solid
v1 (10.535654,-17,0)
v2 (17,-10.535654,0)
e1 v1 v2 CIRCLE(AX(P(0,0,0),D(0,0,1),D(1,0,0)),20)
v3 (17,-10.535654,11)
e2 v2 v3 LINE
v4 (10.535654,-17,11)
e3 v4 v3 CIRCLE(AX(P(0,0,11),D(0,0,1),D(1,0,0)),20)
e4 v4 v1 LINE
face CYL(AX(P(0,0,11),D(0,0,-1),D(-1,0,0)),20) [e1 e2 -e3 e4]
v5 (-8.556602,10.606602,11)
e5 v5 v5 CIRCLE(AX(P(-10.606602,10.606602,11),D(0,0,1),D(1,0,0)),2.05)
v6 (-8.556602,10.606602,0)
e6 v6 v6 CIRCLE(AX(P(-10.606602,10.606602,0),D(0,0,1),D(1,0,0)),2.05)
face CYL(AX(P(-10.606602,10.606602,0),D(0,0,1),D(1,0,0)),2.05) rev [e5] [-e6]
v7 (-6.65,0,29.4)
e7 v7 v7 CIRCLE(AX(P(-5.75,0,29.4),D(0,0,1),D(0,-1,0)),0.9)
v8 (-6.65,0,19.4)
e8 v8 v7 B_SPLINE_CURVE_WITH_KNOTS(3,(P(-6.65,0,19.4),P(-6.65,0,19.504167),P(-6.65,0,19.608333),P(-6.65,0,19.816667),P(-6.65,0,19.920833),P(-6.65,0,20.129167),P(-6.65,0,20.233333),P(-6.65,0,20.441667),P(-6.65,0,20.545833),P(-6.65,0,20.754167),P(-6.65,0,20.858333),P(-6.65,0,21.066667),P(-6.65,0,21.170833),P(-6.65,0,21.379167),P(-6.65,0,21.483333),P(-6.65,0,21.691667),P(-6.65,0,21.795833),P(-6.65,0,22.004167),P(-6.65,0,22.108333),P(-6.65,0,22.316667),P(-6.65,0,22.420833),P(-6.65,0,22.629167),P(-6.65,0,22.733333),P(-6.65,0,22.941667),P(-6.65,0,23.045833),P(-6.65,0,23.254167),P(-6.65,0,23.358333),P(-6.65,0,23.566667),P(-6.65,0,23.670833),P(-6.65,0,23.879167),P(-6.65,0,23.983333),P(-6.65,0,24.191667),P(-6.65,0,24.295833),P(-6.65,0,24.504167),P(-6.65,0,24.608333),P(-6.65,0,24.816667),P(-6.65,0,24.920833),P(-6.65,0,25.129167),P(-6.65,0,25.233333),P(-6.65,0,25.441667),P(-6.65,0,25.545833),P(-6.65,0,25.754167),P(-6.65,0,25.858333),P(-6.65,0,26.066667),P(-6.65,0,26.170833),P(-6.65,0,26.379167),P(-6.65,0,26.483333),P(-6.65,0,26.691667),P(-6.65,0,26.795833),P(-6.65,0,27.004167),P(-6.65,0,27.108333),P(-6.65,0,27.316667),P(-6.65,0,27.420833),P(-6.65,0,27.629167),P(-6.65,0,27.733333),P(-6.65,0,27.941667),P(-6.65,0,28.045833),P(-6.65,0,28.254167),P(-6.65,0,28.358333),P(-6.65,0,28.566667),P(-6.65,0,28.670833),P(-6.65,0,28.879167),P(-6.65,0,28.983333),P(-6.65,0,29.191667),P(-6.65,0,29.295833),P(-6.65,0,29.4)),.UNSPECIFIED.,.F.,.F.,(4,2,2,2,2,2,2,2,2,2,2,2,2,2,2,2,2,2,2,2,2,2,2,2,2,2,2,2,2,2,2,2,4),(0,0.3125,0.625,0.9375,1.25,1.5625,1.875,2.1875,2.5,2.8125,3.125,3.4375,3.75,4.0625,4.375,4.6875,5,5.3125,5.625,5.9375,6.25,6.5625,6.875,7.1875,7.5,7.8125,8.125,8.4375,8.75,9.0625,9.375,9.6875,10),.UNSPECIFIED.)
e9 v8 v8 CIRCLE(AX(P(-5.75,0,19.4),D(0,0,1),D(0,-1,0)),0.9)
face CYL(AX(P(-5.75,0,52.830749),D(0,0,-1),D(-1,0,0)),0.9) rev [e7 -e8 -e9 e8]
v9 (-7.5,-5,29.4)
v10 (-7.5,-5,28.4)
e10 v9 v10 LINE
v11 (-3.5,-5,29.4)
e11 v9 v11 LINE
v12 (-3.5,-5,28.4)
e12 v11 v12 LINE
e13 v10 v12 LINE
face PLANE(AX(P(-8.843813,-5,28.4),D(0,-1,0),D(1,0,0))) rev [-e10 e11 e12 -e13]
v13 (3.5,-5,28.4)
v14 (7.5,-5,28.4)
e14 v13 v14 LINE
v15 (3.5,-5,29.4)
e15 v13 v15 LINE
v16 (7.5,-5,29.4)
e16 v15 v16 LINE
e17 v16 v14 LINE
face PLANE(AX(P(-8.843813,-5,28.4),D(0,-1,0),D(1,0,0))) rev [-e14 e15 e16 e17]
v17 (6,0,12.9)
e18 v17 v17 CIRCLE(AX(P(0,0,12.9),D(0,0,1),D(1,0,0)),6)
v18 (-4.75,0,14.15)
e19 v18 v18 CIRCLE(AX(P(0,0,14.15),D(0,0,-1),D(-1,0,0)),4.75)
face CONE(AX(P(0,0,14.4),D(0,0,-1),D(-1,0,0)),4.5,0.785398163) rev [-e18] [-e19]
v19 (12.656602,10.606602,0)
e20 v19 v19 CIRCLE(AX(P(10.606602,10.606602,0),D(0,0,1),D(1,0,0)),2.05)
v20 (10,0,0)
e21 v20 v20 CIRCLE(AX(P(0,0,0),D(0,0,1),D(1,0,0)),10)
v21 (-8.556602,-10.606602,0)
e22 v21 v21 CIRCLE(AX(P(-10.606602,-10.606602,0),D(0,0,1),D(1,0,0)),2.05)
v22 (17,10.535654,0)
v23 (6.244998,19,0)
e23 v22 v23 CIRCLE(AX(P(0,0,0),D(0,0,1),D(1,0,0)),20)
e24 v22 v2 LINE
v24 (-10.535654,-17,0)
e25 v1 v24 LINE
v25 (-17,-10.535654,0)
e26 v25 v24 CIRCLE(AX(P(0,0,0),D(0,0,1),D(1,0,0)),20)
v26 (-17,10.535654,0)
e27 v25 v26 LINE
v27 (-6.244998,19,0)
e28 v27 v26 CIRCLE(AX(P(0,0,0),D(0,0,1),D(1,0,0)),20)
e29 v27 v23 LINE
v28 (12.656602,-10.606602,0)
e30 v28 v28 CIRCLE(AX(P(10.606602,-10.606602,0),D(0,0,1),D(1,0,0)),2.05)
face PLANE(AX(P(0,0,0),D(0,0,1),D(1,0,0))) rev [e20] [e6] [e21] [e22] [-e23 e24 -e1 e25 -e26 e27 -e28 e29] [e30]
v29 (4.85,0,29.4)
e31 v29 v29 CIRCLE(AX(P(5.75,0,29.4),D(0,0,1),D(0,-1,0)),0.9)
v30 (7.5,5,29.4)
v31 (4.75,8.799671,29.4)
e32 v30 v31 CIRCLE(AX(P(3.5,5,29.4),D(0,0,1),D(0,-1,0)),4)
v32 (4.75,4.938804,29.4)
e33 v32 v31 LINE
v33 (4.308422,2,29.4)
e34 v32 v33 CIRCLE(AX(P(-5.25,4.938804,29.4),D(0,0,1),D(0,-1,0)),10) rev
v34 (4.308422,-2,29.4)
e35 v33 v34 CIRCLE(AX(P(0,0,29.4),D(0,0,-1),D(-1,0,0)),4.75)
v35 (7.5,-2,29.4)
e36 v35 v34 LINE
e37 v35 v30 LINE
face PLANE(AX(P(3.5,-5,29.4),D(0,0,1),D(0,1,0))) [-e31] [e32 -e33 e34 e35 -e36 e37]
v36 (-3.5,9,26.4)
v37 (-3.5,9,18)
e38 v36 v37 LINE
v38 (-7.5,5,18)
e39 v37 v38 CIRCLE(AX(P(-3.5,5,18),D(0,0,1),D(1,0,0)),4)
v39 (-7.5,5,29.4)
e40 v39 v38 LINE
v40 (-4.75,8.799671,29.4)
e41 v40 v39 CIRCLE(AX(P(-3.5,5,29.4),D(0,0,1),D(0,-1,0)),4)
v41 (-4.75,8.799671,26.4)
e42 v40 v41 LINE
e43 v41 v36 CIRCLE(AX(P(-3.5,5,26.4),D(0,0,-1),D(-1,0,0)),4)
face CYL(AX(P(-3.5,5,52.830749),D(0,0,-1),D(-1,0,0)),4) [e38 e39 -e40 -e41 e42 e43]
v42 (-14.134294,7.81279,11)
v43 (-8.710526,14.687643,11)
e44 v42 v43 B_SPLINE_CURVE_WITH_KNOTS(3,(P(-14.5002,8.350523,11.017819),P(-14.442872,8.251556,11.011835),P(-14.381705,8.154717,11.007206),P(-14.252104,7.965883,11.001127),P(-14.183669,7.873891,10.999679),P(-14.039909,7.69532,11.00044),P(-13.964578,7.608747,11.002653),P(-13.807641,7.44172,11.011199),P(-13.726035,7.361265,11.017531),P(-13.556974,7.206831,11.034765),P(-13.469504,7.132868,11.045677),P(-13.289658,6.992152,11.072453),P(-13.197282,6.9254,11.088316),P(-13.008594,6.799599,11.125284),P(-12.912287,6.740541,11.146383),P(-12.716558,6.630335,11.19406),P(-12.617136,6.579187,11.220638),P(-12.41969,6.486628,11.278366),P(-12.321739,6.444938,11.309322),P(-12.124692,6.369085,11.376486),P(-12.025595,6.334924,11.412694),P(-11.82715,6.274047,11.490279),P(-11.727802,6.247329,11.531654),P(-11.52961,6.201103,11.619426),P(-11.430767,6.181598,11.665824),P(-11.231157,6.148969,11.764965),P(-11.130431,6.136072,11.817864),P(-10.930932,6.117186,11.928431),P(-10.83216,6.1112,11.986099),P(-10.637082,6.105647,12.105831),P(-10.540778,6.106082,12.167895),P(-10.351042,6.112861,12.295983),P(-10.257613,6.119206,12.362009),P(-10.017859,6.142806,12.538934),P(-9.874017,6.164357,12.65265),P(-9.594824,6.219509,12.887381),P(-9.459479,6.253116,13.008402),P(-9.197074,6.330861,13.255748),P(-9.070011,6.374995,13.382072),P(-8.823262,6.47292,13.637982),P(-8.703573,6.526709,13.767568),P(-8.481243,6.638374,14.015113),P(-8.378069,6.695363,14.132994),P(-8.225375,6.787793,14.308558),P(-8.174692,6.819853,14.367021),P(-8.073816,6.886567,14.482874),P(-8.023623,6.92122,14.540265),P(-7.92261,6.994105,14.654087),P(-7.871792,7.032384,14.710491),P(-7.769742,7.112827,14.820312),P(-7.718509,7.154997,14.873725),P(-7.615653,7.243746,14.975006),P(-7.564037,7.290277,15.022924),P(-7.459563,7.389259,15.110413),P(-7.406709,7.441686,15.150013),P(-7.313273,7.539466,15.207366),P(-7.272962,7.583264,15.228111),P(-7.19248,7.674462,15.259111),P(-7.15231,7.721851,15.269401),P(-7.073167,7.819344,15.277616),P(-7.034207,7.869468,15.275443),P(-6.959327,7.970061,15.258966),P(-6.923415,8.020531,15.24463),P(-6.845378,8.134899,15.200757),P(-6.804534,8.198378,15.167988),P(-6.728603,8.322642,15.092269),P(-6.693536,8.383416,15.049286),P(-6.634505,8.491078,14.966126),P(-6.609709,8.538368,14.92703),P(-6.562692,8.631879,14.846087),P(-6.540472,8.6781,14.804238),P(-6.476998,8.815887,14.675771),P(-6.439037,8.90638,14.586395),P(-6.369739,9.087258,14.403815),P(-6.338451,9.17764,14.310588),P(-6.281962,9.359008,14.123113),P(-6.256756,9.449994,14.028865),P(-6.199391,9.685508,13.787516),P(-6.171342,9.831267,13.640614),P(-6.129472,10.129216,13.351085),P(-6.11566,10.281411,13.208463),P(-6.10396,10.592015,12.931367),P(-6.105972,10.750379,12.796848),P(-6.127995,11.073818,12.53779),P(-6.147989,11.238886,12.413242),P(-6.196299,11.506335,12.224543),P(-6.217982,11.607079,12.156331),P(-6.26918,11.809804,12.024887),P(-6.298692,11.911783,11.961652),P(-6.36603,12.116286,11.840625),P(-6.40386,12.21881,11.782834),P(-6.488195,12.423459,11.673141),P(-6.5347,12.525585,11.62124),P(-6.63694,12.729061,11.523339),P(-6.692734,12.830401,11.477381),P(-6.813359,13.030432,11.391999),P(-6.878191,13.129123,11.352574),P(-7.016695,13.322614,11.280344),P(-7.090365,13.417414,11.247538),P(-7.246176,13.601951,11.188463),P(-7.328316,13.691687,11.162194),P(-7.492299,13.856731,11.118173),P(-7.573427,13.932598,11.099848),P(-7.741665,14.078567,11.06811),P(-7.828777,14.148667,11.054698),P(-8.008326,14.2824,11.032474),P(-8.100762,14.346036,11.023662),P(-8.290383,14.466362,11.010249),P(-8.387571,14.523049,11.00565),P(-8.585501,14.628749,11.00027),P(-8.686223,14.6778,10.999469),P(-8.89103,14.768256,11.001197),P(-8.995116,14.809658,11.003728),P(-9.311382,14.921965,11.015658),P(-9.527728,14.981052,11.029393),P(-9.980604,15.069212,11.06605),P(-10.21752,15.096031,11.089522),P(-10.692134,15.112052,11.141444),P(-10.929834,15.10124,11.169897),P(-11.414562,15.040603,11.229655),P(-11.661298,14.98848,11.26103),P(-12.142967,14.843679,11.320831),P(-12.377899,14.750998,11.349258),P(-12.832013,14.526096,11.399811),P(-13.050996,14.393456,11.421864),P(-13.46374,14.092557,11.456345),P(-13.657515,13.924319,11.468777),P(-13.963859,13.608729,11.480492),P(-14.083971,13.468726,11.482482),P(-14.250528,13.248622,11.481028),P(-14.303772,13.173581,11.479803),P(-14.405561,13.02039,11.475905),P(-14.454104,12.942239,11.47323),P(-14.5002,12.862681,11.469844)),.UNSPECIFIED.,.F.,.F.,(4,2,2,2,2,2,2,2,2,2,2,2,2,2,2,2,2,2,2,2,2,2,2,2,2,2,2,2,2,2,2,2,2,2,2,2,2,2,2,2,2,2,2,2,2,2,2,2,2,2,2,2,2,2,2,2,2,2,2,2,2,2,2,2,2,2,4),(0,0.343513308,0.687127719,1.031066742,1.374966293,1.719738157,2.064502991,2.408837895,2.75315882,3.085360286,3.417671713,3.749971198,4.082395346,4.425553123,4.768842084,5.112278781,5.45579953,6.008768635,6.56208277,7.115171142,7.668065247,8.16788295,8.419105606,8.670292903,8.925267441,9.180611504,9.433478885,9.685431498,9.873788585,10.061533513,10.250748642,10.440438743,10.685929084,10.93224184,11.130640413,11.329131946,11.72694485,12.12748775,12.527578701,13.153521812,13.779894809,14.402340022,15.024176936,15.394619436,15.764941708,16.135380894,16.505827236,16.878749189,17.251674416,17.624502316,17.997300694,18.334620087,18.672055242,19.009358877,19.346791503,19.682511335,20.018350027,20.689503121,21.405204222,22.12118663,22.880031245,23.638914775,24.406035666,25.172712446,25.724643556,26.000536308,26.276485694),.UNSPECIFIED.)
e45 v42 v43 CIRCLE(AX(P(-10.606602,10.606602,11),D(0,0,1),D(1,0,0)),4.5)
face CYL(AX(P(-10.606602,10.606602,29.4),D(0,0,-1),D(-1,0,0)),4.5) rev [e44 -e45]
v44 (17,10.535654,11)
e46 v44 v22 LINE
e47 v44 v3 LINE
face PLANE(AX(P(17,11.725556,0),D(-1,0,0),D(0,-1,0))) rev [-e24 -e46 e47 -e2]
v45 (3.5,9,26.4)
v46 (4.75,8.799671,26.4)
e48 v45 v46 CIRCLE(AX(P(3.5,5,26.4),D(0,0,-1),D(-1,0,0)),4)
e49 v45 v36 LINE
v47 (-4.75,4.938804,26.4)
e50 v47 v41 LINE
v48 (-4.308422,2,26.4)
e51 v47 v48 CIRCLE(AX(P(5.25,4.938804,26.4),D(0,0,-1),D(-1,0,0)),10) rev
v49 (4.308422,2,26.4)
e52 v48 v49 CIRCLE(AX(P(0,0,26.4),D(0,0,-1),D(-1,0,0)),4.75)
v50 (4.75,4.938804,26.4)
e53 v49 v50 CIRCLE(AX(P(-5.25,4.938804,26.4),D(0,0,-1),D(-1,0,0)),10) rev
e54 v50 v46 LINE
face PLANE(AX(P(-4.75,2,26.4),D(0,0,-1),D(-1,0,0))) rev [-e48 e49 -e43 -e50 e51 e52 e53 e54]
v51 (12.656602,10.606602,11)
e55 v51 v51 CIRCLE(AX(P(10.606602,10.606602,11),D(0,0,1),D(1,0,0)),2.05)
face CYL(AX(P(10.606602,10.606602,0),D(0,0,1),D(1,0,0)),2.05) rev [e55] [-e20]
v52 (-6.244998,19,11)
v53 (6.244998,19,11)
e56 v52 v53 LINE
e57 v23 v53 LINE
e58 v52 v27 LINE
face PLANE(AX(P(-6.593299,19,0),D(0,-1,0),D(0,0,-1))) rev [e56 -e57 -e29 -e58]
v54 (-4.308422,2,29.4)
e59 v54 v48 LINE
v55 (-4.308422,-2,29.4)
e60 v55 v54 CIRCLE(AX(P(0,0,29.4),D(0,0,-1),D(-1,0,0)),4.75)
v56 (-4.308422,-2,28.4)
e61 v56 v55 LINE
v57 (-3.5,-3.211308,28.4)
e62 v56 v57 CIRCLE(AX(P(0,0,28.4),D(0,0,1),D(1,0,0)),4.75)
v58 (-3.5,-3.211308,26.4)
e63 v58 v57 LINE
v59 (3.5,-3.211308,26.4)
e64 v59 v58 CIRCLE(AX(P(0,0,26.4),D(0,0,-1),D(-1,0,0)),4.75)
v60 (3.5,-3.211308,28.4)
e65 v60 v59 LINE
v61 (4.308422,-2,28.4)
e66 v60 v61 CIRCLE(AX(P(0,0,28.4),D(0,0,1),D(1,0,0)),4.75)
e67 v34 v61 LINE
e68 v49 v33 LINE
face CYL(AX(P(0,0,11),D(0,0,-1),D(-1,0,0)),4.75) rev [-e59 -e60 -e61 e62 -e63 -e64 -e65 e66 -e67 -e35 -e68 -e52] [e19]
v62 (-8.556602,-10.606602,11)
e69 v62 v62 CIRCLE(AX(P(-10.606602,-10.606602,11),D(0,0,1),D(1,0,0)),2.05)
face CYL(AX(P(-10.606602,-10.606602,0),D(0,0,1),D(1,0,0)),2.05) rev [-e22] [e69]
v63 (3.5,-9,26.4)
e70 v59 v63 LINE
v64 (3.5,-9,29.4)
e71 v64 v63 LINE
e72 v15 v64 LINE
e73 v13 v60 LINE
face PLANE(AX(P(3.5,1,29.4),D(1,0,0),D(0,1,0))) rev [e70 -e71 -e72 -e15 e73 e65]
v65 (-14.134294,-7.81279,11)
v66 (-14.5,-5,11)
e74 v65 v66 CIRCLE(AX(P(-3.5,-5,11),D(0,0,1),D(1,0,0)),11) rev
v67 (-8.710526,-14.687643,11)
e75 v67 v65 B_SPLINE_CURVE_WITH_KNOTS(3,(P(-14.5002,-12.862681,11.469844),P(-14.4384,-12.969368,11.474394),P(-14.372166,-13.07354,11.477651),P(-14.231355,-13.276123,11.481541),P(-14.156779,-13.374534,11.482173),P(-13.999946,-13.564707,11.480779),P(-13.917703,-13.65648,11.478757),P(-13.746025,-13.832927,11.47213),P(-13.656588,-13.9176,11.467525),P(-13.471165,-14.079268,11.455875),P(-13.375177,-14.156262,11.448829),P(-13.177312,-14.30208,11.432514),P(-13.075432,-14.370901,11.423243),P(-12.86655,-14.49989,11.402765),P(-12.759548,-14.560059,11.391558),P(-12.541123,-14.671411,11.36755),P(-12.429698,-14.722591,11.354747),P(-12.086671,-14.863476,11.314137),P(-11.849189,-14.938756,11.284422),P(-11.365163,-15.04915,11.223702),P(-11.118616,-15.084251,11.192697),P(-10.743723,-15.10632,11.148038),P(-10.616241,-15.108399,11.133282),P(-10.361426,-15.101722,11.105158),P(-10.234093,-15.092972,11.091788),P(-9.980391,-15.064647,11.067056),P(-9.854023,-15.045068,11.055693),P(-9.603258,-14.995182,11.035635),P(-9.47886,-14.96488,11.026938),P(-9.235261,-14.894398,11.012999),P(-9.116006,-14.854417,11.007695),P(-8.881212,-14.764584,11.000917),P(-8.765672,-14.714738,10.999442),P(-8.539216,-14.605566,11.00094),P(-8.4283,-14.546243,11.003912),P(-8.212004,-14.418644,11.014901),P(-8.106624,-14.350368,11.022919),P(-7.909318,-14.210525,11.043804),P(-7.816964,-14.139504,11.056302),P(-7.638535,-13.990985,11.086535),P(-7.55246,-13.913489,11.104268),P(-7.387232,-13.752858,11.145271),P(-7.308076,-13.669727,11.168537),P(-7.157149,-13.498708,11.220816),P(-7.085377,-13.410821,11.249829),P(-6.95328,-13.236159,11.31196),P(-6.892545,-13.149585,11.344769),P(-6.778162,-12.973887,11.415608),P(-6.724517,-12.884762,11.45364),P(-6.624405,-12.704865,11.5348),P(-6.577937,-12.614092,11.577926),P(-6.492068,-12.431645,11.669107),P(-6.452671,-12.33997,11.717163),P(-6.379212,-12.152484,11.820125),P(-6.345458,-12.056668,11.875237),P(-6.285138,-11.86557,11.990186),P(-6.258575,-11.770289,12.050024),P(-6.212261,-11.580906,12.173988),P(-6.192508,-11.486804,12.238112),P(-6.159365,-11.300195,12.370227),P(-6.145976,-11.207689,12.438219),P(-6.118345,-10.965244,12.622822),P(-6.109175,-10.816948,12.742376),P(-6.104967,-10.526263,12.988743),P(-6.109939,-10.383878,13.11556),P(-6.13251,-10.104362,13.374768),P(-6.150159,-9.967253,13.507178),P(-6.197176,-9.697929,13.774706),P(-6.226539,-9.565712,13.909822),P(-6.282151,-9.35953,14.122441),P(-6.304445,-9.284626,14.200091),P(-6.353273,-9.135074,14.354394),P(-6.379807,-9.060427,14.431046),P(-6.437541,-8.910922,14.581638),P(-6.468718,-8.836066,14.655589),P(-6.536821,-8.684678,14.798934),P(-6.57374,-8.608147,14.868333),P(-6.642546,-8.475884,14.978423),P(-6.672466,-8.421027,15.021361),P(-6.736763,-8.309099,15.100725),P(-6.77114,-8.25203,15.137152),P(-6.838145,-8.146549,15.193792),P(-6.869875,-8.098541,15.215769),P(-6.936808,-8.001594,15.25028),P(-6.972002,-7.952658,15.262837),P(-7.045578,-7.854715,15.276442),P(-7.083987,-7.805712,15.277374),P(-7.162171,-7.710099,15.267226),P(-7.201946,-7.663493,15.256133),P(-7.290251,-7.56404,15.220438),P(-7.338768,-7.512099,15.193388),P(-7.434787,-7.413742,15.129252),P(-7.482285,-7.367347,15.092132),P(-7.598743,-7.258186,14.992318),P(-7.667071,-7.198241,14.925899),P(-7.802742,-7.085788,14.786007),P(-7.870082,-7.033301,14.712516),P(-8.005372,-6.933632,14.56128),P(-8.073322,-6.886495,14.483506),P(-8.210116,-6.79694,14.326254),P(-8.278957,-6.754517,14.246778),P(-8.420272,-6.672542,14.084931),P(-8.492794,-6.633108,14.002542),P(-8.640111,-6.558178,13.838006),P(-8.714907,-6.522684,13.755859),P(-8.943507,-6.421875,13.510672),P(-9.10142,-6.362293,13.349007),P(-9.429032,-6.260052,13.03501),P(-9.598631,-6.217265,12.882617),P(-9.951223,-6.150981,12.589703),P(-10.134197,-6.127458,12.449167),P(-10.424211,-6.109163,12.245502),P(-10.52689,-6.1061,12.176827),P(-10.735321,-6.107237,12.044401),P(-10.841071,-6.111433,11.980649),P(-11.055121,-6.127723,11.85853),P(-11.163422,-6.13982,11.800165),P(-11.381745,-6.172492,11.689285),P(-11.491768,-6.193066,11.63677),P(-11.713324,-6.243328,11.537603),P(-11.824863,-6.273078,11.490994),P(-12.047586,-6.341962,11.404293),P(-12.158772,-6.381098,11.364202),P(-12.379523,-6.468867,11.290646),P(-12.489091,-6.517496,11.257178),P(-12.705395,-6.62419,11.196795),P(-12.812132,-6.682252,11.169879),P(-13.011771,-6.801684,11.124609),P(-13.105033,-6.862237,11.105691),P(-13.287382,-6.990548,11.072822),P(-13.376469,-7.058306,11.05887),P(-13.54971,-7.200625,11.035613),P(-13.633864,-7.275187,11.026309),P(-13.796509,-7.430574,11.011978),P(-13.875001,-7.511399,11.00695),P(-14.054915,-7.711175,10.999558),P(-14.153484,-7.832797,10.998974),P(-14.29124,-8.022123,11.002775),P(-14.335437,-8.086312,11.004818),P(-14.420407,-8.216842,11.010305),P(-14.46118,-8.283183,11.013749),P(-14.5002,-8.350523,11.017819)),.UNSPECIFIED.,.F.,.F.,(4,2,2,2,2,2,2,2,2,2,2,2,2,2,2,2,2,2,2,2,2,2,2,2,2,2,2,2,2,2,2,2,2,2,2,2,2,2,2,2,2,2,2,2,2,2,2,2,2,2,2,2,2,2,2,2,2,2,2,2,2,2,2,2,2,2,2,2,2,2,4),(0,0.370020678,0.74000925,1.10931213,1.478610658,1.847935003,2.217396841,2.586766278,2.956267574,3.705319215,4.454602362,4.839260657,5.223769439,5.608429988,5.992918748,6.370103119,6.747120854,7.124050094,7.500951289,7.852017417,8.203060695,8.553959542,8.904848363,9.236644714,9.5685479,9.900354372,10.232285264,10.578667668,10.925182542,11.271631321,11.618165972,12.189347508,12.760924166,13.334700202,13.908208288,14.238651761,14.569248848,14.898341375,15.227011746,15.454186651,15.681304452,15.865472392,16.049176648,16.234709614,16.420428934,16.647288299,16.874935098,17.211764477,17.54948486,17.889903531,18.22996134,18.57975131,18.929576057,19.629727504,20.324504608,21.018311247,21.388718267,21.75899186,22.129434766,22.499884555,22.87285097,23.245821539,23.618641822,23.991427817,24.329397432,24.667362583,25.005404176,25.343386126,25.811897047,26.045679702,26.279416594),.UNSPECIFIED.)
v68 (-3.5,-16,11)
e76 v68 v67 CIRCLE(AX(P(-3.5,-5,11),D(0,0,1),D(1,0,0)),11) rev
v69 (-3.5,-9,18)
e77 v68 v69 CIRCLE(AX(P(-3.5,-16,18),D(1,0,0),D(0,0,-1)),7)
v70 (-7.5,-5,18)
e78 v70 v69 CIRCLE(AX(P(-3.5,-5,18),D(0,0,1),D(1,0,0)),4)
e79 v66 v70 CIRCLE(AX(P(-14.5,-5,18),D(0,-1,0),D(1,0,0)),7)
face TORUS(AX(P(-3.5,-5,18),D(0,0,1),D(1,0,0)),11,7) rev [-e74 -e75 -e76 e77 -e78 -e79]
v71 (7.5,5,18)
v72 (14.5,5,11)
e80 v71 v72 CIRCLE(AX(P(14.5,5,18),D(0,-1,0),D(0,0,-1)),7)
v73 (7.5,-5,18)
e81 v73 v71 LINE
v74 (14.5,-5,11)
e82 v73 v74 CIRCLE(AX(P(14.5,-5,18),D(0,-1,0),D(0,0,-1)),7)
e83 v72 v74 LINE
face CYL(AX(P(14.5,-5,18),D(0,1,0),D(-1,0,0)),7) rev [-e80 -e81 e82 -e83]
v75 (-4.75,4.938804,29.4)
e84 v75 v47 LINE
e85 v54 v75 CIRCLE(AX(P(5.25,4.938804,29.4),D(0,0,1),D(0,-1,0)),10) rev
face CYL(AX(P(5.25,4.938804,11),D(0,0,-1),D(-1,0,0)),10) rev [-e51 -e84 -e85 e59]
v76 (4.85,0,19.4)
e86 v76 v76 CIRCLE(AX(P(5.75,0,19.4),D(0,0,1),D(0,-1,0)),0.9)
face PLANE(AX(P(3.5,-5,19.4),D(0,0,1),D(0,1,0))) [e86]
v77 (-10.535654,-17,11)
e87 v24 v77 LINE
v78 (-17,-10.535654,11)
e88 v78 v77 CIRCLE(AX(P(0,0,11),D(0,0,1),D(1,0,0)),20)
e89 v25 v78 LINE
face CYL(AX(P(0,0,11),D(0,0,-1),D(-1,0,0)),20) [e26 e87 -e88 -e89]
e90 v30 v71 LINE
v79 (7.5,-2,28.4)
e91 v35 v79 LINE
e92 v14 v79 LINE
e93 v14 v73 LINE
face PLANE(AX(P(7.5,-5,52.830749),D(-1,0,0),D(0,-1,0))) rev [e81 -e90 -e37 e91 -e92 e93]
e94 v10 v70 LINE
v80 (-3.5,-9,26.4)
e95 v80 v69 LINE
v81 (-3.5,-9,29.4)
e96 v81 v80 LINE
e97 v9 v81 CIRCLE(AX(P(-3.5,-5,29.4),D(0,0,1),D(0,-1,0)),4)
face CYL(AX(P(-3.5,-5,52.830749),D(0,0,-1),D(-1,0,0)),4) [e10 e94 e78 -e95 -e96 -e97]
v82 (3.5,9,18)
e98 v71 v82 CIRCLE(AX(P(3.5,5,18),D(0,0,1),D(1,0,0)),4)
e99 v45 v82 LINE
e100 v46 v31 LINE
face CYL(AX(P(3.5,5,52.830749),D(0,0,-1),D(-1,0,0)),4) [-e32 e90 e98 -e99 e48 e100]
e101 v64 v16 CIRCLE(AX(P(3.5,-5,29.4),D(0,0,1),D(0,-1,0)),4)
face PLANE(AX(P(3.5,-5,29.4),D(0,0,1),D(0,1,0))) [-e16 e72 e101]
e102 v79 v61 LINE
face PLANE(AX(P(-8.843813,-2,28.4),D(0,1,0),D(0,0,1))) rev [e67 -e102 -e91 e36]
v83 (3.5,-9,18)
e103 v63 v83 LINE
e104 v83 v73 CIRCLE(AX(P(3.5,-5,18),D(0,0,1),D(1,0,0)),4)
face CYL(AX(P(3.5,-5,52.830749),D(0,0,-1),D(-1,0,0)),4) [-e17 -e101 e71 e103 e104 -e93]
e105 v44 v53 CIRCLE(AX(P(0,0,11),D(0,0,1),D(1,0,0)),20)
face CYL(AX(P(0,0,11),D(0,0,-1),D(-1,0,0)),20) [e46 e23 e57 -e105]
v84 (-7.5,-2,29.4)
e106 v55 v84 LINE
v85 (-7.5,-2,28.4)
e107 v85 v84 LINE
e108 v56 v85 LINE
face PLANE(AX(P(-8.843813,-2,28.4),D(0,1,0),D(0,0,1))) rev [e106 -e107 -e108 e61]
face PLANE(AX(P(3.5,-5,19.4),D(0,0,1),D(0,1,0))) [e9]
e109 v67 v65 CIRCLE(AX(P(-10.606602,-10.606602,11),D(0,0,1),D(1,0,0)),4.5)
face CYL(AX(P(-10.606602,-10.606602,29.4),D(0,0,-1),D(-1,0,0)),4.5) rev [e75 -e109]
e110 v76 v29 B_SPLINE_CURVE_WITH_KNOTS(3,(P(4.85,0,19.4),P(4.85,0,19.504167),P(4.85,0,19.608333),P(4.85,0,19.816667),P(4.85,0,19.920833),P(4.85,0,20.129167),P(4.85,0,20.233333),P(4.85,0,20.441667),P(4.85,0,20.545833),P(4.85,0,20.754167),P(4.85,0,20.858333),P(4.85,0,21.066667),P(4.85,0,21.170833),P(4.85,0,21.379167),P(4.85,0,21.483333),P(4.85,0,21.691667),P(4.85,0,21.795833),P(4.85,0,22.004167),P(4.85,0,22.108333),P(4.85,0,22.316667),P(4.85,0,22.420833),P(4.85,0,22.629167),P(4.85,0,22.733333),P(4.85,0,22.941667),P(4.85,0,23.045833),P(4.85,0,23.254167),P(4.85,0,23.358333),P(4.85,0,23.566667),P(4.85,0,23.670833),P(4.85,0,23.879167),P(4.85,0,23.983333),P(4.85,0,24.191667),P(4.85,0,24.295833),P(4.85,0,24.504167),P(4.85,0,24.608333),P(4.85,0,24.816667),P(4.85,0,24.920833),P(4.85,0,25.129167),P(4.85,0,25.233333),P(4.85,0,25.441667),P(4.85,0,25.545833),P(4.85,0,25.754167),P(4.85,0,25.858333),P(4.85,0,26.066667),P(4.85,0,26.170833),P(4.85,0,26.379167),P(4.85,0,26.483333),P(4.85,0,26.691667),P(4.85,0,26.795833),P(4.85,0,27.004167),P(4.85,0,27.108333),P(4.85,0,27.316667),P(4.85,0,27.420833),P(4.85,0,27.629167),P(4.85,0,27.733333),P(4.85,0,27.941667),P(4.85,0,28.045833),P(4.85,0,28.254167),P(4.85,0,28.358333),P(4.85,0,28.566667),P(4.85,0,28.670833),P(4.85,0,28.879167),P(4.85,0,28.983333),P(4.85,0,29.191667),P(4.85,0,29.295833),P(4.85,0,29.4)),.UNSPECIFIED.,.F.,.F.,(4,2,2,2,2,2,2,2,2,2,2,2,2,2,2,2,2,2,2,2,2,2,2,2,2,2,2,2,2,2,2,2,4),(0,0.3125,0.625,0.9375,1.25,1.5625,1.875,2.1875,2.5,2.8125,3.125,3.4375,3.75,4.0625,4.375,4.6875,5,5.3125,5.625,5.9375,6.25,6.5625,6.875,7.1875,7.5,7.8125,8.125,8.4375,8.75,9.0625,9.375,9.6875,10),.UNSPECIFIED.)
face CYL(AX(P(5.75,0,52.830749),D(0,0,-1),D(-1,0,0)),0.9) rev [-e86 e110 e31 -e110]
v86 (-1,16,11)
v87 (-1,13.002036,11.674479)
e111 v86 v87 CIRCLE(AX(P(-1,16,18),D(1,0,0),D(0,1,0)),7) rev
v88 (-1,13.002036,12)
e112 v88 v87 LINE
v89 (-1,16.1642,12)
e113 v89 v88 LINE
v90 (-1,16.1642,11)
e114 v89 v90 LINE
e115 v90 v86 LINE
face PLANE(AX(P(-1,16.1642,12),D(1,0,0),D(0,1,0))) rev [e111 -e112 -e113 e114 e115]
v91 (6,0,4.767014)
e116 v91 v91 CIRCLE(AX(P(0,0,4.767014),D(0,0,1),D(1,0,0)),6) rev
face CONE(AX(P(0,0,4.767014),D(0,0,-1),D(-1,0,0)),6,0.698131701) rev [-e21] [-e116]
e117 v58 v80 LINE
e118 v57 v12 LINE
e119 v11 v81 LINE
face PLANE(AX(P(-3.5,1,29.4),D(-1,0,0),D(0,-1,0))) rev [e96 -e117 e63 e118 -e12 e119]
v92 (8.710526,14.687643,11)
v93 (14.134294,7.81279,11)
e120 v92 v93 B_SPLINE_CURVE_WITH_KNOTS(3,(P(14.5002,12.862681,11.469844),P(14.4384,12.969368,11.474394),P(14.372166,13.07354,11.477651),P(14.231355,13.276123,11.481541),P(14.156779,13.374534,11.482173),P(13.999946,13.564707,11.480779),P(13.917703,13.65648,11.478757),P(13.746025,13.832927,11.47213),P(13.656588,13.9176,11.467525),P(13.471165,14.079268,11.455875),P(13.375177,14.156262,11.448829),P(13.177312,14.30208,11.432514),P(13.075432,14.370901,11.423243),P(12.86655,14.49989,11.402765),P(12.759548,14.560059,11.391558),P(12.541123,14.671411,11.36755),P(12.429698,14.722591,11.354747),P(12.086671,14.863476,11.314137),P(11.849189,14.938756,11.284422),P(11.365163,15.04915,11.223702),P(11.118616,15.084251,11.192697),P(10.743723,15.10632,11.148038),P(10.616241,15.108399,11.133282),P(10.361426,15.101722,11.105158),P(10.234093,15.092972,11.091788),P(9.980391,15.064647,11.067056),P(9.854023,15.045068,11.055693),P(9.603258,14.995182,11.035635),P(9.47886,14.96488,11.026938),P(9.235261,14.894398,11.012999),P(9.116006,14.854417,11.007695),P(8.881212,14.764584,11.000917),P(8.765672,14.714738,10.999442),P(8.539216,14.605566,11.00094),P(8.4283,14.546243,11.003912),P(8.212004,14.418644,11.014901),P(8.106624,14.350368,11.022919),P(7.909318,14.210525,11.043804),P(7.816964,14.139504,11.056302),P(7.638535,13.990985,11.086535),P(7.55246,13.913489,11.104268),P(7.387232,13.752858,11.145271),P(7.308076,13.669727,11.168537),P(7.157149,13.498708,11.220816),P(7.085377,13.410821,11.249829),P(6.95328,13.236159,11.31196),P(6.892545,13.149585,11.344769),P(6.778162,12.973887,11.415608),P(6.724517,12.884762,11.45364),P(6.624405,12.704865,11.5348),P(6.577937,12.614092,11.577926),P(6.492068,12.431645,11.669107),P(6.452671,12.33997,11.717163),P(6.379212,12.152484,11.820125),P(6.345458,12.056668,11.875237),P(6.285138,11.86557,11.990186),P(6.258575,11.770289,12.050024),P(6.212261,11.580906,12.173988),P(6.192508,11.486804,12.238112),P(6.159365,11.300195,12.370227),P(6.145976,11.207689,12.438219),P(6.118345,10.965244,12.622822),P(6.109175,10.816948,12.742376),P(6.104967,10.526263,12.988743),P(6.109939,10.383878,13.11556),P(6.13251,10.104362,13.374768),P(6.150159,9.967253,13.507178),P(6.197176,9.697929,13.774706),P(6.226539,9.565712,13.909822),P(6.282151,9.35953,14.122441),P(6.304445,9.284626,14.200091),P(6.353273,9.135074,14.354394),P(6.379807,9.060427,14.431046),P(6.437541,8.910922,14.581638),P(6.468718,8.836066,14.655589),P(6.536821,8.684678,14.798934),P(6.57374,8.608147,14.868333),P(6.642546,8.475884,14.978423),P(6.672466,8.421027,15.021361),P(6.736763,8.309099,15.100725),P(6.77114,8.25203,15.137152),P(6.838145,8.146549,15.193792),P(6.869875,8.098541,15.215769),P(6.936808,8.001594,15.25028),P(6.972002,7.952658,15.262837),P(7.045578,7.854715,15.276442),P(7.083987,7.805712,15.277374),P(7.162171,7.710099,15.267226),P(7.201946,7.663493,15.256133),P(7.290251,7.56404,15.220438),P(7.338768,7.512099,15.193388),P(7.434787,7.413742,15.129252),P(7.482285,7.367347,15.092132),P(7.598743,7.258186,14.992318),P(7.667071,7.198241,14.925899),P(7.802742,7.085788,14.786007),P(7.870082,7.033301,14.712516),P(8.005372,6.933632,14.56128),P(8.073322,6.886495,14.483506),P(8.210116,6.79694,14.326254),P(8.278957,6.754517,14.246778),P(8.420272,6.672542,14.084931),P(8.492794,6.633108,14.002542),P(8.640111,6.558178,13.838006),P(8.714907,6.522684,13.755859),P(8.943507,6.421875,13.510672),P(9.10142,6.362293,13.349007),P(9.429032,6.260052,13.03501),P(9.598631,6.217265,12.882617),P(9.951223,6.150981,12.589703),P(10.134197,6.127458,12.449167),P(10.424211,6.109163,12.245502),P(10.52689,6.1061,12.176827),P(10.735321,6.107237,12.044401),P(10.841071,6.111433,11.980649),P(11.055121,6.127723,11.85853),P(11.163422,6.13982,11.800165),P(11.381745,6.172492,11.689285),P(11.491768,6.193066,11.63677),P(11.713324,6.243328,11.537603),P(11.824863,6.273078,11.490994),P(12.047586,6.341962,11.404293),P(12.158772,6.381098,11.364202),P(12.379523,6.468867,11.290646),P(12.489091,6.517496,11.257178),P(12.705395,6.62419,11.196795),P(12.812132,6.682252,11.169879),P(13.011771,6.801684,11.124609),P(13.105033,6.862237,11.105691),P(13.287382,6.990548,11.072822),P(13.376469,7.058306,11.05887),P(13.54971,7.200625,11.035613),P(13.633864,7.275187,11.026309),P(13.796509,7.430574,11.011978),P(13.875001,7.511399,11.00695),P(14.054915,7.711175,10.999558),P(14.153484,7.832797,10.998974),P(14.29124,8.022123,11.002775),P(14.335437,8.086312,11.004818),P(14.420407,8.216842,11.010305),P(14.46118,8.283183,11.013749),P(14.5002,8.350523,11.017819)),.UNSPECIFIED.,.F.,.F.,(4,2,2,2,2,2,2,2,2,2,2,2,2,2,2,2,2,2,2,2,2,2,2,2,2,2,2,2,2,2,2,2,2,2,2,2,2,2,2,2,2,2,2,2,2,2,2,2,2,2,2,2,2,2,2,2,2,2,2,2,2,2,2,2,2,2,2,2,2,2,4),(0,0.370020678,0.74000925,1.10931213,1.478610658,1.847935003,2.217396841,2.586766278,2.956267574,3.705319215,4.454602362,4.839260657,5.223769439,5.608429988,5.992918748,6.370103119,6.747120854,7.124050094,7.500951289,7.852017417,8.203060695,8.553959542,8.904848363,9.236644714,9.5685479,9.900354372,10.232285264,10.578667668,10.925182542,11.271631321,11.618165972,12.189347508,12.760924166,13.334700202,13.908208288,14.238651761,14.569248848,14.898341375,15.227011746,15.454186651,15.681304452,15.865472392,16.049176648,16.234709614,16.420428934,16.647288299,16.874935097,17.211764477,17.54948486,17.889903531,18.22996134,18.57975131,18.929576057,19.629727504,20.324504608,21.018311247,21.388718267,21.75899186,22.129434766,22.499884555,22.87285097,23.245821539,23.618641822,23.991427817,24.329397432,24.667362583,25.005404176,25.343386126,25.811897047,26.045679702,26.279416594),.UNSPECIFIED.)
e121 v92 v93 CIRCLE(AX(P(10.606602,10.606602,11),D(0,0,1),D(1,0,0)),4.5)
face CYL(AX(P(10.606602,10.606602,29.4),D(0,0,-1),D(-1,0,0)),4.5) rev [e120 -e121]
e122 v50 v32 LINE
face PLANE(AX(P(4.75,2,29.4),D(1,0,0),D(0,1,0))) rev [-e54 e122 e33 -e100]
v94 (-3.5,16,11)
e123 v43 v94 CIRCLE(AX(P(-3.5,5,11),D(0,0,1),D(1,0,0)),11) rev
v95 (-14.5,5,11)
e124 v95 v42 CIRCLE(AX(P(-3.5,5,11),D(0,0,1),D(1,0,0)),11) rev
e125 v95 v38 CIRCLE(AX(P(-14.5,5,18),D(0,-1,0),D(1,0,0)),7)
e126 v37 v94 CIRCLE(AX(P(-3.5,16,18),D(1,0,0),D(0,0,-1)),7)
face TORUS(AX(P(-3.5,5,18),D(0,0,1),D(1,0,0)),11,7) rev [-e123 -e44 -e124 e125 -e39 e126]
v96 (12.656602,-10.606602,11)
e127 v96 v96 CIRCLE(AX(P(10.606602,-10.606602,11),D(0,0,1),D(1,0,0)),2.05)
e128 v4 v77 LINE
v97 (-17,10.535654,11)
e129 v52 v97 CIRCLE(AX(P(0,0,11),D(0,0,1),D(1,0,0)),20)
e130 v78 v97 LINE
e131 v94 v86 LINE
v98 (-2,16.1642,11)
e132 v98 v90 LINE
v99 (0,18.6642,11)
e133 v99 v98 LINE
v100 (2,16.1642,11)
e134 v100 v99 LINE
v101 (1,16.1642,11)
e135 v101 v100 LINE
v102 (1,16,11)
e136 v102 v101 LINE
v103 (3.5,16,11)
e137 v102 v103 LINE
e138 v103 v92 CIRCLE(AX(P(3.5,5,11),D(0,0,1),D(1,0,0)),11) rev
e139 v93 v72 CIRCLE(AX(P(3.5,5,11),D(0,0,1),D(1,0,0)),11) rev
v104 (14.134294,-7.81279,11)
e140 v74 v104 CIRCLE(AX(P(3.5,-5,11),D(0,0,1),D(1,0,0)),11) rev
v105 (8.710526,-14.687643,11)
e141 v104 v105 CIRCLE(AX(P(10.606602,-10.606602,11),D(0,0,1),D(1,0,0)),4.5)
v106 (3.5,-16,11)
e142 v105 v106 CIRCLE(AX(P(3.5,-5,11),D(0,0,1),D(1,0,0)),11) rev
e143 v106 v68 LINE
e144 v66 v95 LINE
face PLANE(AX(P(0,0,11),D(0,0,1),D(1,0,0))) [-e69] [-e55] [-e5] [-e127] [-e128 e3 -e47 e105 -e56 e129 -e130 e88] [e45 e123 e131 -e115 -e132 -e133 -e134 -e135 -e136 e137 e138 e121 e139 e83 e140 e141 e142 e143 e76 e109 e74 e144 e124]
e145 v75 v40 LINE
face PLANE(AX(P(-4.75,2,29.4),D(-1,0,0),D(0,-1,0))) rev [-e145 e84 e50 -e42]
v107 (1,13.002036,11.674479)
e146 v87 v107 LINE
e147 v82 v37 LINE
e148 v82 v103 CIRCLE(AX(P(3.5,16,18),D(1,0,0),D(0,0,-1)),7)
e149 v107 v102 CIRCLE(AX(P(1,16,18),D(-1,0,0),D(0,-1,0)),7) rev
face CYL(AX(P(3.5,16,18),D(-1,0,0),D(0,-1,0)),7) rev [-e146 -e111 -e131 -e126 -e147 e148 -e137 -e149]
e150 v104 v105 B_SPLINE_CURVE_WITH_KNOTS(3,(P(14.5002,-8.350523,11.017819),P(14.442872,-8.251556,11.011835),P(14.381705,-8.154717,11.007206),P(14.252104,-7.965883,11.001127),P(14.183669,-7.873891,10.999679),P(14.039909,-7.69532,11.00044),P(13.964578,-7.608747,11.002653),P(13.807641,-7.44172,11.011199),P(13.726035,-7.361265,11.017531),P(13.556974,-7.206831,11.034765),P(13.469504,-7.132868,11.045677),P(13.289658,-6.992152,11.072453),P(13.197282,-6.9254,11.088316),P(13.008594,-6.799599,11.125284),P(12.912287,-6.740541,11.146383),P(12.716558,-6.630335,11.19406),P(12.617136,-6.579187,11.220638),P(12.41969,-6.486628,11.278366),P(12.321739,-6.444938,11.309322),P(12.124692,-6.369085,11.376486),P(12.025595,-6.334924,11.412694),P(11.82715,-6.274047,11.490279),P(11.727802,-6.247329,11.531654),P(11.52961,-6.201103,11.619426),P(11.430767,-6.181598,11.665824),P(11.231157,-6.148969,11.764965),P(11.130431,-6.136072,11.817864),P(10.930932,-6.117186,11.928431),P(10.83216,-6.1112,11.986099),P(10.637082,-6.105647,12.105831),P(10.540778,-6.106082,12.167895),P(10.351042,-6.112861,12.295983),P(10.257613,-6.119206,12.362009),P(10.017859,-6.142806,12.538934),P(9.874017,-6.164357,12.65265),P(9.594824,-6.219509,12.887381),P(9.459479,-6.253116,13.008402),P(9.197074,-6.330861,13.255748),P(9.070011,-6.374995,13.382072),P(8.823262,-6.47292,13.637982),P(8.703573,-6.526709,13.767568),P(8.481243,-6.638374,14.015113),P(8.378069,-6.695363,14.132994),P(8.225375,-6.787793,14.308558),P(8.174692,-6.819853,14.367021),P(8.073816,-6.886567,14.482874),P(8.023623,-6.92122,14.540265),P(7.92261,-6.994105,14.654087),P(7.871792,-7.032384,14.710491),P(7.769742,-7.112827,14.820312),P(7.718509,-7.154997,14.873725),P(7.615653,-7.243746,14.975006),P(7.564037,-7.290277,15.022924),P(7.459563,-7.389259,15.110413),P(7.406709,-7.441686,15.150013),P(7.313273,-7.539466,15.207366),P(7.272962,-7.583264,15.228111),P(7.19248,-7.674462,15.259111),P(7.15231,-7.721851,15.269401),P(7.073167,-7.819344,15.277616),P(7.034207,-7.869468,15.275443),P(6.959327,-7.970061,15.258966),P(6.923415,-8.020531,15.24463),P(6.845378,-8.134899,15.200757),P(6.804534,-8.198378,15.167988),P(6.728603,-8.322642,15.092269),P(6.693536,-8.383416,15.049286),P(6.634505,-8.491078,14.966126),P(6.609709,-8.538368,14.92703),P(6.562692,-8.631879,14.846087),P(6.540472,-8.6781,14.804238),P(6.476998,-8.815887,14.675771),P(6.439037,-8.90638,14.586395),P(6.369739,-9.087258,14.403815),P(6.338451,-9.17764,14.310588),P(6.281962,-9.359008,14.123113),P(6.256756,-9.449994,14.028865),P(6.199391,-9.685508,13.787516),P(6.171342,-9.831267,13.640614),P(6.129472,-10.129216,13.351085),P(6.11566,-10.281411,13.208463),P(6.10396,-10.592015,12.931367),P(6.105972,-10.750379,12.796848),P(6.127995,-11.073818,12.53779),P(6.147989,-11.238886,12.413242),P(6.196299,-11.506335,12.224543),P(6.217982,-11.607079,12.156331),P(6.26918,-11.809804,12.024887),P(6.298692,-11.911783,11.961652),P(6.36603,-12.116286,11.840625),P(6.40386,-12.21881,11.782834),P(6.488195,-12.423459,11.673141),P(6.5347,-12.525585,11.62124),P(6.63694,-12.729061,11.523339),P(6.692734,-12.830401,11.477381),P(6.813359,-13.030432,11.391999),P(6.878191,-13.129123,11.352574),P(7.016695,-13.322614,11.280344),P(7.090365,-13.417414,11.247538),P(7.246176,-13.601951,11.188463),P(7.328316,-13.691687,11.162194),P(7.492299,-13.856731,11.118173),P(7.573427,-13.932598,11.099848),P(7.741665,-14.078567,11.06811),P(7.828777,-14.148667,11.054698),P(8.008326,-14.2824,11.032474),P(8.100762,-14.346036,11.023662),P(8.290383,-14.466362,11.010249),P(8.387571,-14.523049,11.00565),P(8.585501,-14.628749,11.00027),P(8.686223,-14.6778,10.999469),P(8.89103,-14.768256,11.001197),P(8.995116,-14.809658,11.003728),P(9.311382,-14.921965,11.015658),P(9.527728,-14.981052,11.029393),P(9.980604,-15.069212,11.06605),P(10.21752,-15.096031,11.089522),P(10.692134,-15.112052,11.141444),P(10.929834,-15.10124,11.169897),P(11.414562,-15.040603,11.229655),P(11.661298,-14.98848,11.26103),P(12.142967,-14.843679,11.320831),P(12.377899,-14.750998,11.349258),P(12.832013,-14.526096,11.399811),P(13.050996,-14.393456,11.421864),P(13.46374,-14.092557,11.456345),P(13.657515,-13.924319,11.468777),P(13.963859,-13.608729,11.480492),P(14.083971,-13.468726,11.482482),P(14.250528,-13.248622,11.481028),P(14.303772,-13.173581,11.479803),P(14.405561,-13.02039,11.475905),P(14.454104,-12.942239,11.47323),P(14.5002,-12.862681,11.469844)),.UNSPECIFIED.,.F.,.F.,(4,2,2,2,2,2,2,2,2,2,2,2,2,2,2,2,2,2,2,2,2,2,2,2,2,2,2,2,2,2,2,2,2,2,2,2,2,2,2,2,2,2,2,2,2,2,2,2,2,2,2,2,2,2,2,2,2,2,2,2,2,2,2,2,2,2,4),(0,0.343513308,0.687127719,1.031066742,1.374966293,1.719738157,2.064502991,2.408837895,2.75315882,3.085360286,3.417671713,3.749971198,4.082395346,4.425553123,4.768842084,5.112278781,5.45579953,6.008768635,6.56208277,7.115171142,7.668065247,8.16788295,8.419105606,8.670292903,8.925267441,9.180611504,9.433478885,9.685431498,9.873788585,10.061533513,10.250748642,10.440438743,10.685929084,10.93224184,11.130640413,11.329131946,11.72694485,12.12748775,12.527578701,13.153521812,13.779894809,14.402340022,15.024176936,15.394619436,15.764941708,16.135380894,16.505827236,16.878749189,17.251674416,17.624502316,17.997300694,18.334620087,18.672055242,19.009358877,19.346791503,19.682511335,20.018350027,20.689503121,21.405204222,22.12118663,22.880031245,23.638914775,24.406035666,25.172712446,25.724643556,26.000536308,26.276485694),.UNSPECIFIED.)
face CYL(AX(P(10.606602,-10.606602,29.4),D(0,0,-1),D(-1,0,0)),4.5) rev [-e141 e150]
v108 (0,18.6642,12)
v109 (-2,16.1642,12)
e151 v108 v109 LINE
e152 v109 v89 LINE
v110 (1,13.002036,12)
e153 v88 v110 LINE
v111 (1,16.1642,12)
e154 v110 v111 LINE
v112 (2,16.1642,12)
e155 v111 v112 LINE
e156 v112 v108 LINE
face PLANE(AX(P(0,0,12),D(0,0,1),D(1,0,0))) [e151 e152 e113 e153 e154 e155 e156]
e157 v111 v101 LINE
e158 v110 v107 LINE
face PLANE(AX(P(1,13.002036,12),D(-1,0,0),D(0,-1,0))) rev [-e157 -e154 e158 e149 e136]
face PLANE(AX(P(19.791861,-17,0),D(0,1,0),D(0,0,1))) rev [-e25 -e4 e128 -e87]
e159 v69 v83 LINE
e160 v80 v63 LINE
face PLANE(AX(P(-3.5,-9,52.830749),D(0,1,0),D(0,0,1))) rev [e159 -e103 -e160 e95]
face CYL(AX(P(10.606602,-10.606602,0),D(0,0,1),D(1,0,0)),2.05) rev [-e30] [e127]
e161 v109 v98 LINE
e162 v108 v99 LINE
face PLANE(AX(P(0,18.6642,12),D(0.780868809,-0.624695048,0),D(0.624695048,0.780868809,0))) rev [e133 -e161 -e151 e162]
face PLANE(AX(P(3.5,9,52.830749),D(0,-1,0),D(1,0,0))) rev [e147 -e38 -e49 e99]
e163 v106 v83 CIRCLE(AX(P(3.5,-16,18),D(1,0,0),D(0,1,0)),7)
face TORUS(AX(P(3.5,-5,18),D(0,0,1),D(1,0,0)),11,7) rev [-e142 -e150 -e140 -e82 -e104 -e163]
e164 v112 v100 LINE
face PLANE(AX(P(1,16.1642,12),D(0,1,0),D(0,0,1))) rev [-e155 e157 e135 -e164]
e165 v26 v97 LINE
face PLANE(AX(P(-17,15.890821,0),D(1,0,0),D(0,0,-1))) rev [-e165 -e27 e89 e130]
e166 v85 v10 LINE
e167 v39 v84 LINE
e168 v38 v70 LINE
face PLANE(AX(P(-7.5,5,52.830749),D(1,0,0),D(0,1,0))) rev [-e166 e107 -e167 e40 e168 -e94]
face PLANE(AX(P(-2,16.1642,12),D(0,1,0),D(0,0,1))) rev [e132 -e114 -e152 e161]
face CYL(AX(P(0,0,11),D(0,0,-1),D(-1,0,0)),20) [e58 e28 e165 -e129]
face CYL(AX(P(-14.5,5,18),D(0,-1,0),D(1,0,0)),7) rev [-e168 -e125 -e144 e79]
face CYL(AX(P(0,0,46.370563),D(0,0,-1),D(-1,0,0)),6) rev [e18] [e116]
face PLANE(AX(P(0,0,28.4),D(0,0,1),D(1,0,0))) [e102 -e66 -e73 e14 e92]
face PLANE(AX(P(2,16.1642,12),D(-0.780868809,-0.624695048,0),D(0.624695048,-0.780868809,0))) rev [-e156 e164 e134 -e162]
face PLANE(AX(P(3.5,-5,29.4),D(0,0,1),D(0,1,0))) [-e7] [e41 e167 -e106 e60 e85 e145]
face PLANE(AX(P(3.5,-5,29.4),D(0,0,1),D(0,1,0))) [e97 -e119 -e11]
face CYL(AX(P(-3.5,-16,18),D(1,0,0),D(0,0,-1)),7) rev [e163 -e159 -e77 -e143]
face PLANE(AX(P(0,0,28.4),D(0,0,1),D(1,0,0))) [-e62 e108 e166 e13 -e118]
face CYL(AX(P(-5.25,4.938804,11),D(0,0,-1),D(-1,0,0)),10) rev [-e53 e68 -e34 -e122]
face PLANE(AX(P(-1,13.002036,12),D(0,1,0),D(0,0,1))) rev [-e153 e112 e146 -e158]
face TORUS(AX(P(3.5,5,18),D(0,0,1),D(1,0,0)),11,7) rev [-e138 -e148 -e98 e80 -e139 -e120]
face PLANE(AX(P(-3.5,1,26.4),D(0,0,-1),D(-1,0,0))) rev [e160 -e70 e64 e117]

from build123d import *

# Parameters (mm, degrees)
SKETCH1_R           = 20
SKETCH1_R_2         = 4.75
BOSS_EXTRUDE1_DEPTH = 11
SKETCH2_W           = 13.186598354
SKETCH2_H           = 1
SKETCH2_W_2         = 3
SKETCH2_H_2         = 26.426474467
SKETCH2_H_3         = 26.621798467
SKETCH2_W_3         = 38.736212376
SKETCH2_H_4         = 3
CUT_EXTRUDE1_DEPTH  = 31.347981811
SKETCH3_R           = 2.05
CUT_EXTRUDE2_DEPTH  = 28.766886754
SKETCH5_R           = 0.9
BOSS_EXTRUDE2_DEPTH = 18.4
SKETCH13_R          = 0.9
BOSS_EXTRUDE3_DEPTH = 8.4
SKETCH7_W           = 18.227706113
SKETCH7_H           = 3
CUT_EXTRUDE4_DEPTH  = 1
FILLET1_R           = 7
SKETCH9_R           = 4.5
CUT_EXTRUDE5_DEPTH  = 32.441374016
SKETCH10_R          = 4.75
CUT_EXTRUDE6_DEPTH  = 39.914778684
SKETCH11_W          = 9.5
SKETCH11_H          = 3
CUT_EXTRUDE7_DEPTH  = 7
SKETCH12_R          = 6
CUT_EXTRUDE8_DEPTH  = 14.4
CHAMFER2_SIZE       = 1.5
CHAMFER1_SIZE       = 4
CHAMFER1_SIZE2      = 4.76701437
FILLET2_R           = 10
SKETCH14_W          = 7
SKETCH14_H          = 3
CUT_EXTRUDE9_DEPTH  = 10
BOSS_EXTRUDE4_DEPTH = 1


with BuildPart() as part:
    # Sketch1 → Boss-Extrude1 (new body)
    with BuildSketch(Plane.XY):
        Circle(SKETCH1_R)
        Circle(SKETCH1_R_2, mode=Mode.SUBTRACT)
    extrude(amount=BOSS_EXTRUDE1_DEPTH)

    # Sketch2 → Cut-Extrude1 (cut, through all)
    with BuildSketch(Plane.XY.offset(11)):
        with Locations((0, 19.5)):
            Rectangle(SKETCH2_W, SKETCH2_H)
        with Locations((-18.5, 2.677583481)):
            Rectangle(SKETCH2_W_2, SKETCH2_H_2)
        with Locations((18.5, -1.585343055)):
            Rectangle(SKETCH2_W_2, SKETCH2_H_3)
        with Locations((0.423755219, -18.5)):
            Rectangle(SKETCH2_W_3, SKETCH2_H_4)
    extrude(amount=-CUT_EXTRUDE1_DEPTH, mode=Mode.SUBTRACT)

    # Sketch3 → Cut-Extrude2 (cut, through all)
    with BuildSketch(Plane.XY.offset(11)):
        with Locations((-10.606601718, -10.606601718)):
            Circle(SKETCH3_R)
        with Locations((-10.606601718, 10.606601718)):
            Circle(SKETCH3_R)
        with Locations((10.606601718, 10.606601718)):
            Circle(SKETCH3_R)
        with Locations((10.606601718, -10.606601718)):
            Circle(SKETCH3_R)
    extrude(amount=-CUT_EXTRUDE2_DEPTH, mode=Mode.SUBTRACT)

    # Sketch5 → Boss-Extrude2 (add)
    with BuildSketch(Plane.XY.offset(11)):
        with BuildLine():
            Line((7.5, -5), (7.5, 5))
            ThreePointArc((7.5, 5), (6.328427125, 7.828427125), (3.5, 9))
            Line((3.5, 9), (-3.5, 9))
            ThreePointArc((-3.5, 9), (-6.328427125, 7.828427125), (-7.5, 5))
            Line((-7.5, 5), (-7.5, -5))
            ThreePointArc((-7.5, -5), (-6.328427125, -7.828427125), (-3.5, -9))
            Line((-3.5, -9), (3.5, -9))
            ThreePointArc((3.5, -9), (6.328427125, -7.828427125), (7.5, -5))
        make_face()
        with Locations(Location((-5.75, 0, 0), (0, 0, 180))):
            Circle(SKETCH5_R, mode=Mode.SUBTRACT)
        with Locations(Location((5.75, 0, 0), (0, 0, 180))):
            Circle(SKETCH5_R, mode=Mode.SUBTRACT)
    extrude(amount=BOSS_EXTRUDE2_DEPTH)

    # Sketch13 → Boss-Extrude3 (add)
    with BuildSketch(Plane.XY.offset(11)):
        with Locations(Location((5.75, 0, 0), (0, 0, 180))):
            Circle(SKETCH13_R)
        with Locations(Location((-5.75, 0, 0), (0, 0, 180))):
            Circle(SKETCH13_R)
    extrude(amount=BOSS_EXTRUDE3_DEPTH)

    # Sketch7 → Cut-Extrude4 (cut)
    with BuildSketch(Plane.XY.offset(29.4)):
        with Locations((0.270040091, -3.5)):
            Rectangle(SKETCH7_W, SKETCH7_H)
    extrude(amount=-CUT_EXTRUDE4_DEPTH, mode=Mode.SUBTRACT)

    # Fillet1
    # the kernel refuses this fillet: 7 mm, written as the material it adds along each edge
    with BuildSketch(Plane(origin=(-3.5, -9, 11), x_dir=(0, -1, 0), z_dir=(1, 0, 0)), Plane(origin=(3.5, 9, 11), x_dir=(0, 1, 0), z_dir=(-1, 0, 0))) as fillet1_piece_1:
        with BuildLine():
            CenterArc((FILLET1_R, -FILLET1_R), FILLET1_R, 90, 90)
            Line((0, -FILLET1_R), (0, 0))
            Line((0, 0), (FILLET1_R, 0))
        make_face()
    extrude(amount=7)
    with BuildSketch(Plane(origin=(-3.5, -5, 11), x_dir=(-1, 0, 0), z_dir=(0, 1, 0))) as fillet1_piece_2_section:
        with BuildLine():
            CenterArc((4 + FILLET1_R, FILLET1_R), FILLET1_R, 180, 90)
            Line((4, FILLET1_R), (4, 0))
            Line((4, 0), (4 + FILLET1_R, 0))
        make_face()
    fillet1_piece_2 = revolve(axis=Axis((-3.5, -5, 11), (0, 0, 1)), revolution_arc=90, mode=Mode.PRIVATE)
    fillet1_piece_2 = fillet1_piece_2 - Plane(origin=(-10.606601718, -10.606601718, 12.414511809), x_dir=(1, 0, 0), z_dir=(0, 0, 1)) * Cylinder(2.05, 44, mode=Mode.PRIVATE)
    add(fillet1_piece_2)
    with BuildSketch(Plane(origin=(-7.5, 5, 11), x_dir=(-1, 0, 0), z_dir=(0, -1, 0)), Plane(origin=(7.5, -5, 11), x_dir=(1, 0, 0), z_dir=(0, 1, 0))) as fillet1_piece_3:
        with BuildLine():
            CenterArc((FILLET1_R, -FILLET1_R), FILLET1_R, 90, 90)
            Line((0, -FILLET1_R), (0, 0))
            Line((0, 0), (FILLET1_R, 0))
        make_face()
    extrude(amount=10)
    with BuildSketch(Plane(origin=(-3.5, 5, 11), x_dir=(0, 1, 0), z_dir=(1, 0, 0))) as fillet1_piece_4_section:
        with BuildLine():
            CenterArc((4 + FILLET1_R, FILLET1_R), FILLET1_R, 180, 90)
            Line((4, FILLET1_R), (4, 0))
            Line((4, 0), (4 + FILLET1_R, 0))
        make_face()
    fillet1_piece_4 = revolve(axis=Axis((-3.5, 5, 11), (0, 0, 1)), revolution_arc=90, mode=Mode.PRIVATE)
    fillet1_piece_4 = fillet1_piece_4 - Plane(origin=(-10.606601718, 10.606601718, 12.41451172), x_dir=(1, 0, 0), z_dir=(0, 0, 1)) * Cylinder(2.05, 44, mode=Mode.PRIVATE)
    add(fillet1_piece_4)
    with BuildSketch(Plane(origin=(3.5, 5, 11), x_dir=(1, 0, 0), z_dir=(0, -1, 0))) as fillet1_piece_5_section:
        with BuildLine():
            CenterArc((4 + FILLET1_R, FILLET1_R), FILLET1_R, 180, 90)
            Line((4, FILLET1_R), (4, 0))
            Line((4, 0), (4 + FILLET1_R, 0))
        make_face()
    fillet1_piece_5 = revolve(axis=Axis((3.5, 5, 11), (0, 0, 1)), revolution_arc=90, mode=Mode.PRIVATE)
    fillet1_piece_5 = fillet1_piece_5 - Plane(origin=(10.606601718, 10.606601718, 12.414511728), x_dir=(1, 0, 0), z_dir=(0, 0, 1)) * Cylinder(2.05, 44, mode=Mode.PRIVATE)
    add(fillet1_piece_5)
    with BuildSketch(Plane(origin=(3.5, -5, 11), x_dir=(0, -1, 0), z_dir=(-1, 0, 0))) as fillet1_piece_6_section:
        with BuildLine():
            CenterArc((4 + FILLET1_R, FILLET1_R), FILLET1_R, 180, 90)
            Line((4, FILLET1_R), (4, 0))
            Line((4, 0), (4 + FILLET1_R, 0))
        make_face()
    fillet1_piece_6 = revolve(axis=Axis((3.5, -5, 11), (0, 0, 1)), revolution_arc=90, mode=Mode.PRIVATE)
    fillet1_piece_6 = fillet1_piece_6 - Plane(origin=(10.606601718, -10.606601718, 12.4145119), x_dir=(1, 0, 0), z_dir=(0, 0, 1)) * Cylinder(2.05, 44, mode=Mode.PRIVATE)
    add(fillet1_piece_6)

    # Sketch9 → Cut-Extrude5 (cut, through all)
    with BuildSketch(Plane.XY.offset(11)):
        with Locations((10.606601718, 10.606601718)):
            Circle(SKETCH9_R)
        with Locations((10.606601718, -10.606601718)):
            Circle(SKETCH9_R)
        with Locations((-10.606601718, -10.606601718)):
            Circle(SKETCH9_R)
        with Locations((-10.606601718, 10.606601718)):
            Circle(SKETCH9_R)
    extrude(amount=CUT_EXTRUDE5_DEPTH, mode=Mode.SUBTRACT)

    # Sketch10 → Cut-Extrude6 (cut, through all)
    with BuildSketch(Plane(origin=(0, 0, 0), x_dir=(-1, 0, 0), z_dir=(0, 0, -1))):
        with Locations(Location((0, 0, 0), (0, 0, 335.09893763))):
            Circle(SKETCH10_R)
    extrude(amount=-CUT_EXTRUDE6_DEPTH, mode=Mode.SUBTRACT)

    # Sketch11 → Cut-Extrude7 (cut)
    with BuildSketch(Plane(origin=(0, 9, 0), x_dir=(1, 0, 0), z_dir=(0, 1, 0))):
        with Locations((0, -27.9)):
            Rectangle(SKETCH11_W, SKETCH11_H)
    extrude(amount=-CUT_EXTRUDE7_DEPTH, mode=Mode.SUBTRACT)

    # Sketch12 → Cut-Extrude8 (cut)
    with BuildSketch(Plane(origin=(0, 0, 0), x_dir=(-1, 0, 0), z_dir=(0, 0, -1))):
        Circle(SKETCH12_R)
    extrude(amount=-CUT_EXTRUDE8_DEPTH, mode=Mode.SUBTRACT)

    # Chamfer2
    # the kernel refuses this chamfer: 1.5 mm, written as the material it adds along each edge
    with BuildSketch(Plane(origin=(0, 0, 14.4), x_dir=(-1, 0, 0), z_dir=(0, -1, 0))) as chamfer2_piece_1_section:
        Polygon((6, CHAMFER2_SIZE), (6 - CHAMFER2_SIZE, 0), (6, 0), align=None)
    chamfer2_piece_1 = revolve(axis=Axis((0, 0, 14.4), (0, 0, -1)), mode=Mode.PRIVATE)
    chamfer2_piece_1 = chamfer2_piece_1 - Plane(origin=(0, 0, 13.528251252), x_dir=(-0.9070362073508065, -0.4210526315731381, 0), z_dir=(0, 0, -1)) * Cylinder(4.75, 24, mode=Mode.PRIVATE)
    add(chamfer2_piece_1)

    # Chamfer1
    chamfer1_edges = [part.edges().sort_by_distance(p)[0] for p in [
        (6, 0, 0),
    ]]
    chamfer1_side = [part.faces().sort_by_distance(p)[0] for p in [
        (16.504823264, 0, 0),
    ]]
    chamfer(chamfer1_edges, length=CHAMFER1_SIZE, length2=CHAMFER1_SIZE2, reference=chamfer1_side[0])

    # Fillet2
    # the kernel refuses this fillet: 10 mm, written as the material it adds along each edge
    with BuildSketch(Plane(origin=(4.75, 2, 29.4), x_dir=(-1, 0, 0), z_dir=(0, 0, -1)), Plane(origin=(-4.75, 2, 19.052989911), x_dir=(1, 0, 0), z_dir=(0, 0, 1))) as fillet2_piece_1:
        with BuildLine():
            CenterArc((10, 2.938804035), FILLET2_R, 180, 17.090413612)
            Line((0, 2.938804035), (-0.2, 2.938804035))
            Line((-0.2, 2.938804035), (-0.2, 0))
            Line((-0.2, 0), (0, -0.2))
            ThreePointArc((0, -0.2), (0.220789008, -0.2), (0.250409575, -0.058776081))
            Line((0.250409575, -0.058776081), (0.441578015, 0))
        make_face()
    extrude(amount=10.347010089)

    # Sketch14 → Cut-Extrude9 (cut)
    with BuildSketch(Plane.XZ.offset(9)):
        with Locations((0, 27.9)):
            Rectangle(SKETCH14_W, SKETCH14_H)
    extrude(amount=-CUT_EXTRUDE9_DEPTH, mode=Mode.SUBTRACT)

    # Sketch15 → Boss-Extrude4 (add)
    with BuildSketch(Plane.XY.offset(11)):
        Polygon((-1, 13.002035862), (1, 13.002035862), (1, 16.164200489), (2, 16.164200489), (0, 18.664200489), (-2, 16.164200489), (-1, 16.164200489), align=None)
    extrude(amount=BOSS_EXTRUDE4_DEPTH)


solid = part.part
